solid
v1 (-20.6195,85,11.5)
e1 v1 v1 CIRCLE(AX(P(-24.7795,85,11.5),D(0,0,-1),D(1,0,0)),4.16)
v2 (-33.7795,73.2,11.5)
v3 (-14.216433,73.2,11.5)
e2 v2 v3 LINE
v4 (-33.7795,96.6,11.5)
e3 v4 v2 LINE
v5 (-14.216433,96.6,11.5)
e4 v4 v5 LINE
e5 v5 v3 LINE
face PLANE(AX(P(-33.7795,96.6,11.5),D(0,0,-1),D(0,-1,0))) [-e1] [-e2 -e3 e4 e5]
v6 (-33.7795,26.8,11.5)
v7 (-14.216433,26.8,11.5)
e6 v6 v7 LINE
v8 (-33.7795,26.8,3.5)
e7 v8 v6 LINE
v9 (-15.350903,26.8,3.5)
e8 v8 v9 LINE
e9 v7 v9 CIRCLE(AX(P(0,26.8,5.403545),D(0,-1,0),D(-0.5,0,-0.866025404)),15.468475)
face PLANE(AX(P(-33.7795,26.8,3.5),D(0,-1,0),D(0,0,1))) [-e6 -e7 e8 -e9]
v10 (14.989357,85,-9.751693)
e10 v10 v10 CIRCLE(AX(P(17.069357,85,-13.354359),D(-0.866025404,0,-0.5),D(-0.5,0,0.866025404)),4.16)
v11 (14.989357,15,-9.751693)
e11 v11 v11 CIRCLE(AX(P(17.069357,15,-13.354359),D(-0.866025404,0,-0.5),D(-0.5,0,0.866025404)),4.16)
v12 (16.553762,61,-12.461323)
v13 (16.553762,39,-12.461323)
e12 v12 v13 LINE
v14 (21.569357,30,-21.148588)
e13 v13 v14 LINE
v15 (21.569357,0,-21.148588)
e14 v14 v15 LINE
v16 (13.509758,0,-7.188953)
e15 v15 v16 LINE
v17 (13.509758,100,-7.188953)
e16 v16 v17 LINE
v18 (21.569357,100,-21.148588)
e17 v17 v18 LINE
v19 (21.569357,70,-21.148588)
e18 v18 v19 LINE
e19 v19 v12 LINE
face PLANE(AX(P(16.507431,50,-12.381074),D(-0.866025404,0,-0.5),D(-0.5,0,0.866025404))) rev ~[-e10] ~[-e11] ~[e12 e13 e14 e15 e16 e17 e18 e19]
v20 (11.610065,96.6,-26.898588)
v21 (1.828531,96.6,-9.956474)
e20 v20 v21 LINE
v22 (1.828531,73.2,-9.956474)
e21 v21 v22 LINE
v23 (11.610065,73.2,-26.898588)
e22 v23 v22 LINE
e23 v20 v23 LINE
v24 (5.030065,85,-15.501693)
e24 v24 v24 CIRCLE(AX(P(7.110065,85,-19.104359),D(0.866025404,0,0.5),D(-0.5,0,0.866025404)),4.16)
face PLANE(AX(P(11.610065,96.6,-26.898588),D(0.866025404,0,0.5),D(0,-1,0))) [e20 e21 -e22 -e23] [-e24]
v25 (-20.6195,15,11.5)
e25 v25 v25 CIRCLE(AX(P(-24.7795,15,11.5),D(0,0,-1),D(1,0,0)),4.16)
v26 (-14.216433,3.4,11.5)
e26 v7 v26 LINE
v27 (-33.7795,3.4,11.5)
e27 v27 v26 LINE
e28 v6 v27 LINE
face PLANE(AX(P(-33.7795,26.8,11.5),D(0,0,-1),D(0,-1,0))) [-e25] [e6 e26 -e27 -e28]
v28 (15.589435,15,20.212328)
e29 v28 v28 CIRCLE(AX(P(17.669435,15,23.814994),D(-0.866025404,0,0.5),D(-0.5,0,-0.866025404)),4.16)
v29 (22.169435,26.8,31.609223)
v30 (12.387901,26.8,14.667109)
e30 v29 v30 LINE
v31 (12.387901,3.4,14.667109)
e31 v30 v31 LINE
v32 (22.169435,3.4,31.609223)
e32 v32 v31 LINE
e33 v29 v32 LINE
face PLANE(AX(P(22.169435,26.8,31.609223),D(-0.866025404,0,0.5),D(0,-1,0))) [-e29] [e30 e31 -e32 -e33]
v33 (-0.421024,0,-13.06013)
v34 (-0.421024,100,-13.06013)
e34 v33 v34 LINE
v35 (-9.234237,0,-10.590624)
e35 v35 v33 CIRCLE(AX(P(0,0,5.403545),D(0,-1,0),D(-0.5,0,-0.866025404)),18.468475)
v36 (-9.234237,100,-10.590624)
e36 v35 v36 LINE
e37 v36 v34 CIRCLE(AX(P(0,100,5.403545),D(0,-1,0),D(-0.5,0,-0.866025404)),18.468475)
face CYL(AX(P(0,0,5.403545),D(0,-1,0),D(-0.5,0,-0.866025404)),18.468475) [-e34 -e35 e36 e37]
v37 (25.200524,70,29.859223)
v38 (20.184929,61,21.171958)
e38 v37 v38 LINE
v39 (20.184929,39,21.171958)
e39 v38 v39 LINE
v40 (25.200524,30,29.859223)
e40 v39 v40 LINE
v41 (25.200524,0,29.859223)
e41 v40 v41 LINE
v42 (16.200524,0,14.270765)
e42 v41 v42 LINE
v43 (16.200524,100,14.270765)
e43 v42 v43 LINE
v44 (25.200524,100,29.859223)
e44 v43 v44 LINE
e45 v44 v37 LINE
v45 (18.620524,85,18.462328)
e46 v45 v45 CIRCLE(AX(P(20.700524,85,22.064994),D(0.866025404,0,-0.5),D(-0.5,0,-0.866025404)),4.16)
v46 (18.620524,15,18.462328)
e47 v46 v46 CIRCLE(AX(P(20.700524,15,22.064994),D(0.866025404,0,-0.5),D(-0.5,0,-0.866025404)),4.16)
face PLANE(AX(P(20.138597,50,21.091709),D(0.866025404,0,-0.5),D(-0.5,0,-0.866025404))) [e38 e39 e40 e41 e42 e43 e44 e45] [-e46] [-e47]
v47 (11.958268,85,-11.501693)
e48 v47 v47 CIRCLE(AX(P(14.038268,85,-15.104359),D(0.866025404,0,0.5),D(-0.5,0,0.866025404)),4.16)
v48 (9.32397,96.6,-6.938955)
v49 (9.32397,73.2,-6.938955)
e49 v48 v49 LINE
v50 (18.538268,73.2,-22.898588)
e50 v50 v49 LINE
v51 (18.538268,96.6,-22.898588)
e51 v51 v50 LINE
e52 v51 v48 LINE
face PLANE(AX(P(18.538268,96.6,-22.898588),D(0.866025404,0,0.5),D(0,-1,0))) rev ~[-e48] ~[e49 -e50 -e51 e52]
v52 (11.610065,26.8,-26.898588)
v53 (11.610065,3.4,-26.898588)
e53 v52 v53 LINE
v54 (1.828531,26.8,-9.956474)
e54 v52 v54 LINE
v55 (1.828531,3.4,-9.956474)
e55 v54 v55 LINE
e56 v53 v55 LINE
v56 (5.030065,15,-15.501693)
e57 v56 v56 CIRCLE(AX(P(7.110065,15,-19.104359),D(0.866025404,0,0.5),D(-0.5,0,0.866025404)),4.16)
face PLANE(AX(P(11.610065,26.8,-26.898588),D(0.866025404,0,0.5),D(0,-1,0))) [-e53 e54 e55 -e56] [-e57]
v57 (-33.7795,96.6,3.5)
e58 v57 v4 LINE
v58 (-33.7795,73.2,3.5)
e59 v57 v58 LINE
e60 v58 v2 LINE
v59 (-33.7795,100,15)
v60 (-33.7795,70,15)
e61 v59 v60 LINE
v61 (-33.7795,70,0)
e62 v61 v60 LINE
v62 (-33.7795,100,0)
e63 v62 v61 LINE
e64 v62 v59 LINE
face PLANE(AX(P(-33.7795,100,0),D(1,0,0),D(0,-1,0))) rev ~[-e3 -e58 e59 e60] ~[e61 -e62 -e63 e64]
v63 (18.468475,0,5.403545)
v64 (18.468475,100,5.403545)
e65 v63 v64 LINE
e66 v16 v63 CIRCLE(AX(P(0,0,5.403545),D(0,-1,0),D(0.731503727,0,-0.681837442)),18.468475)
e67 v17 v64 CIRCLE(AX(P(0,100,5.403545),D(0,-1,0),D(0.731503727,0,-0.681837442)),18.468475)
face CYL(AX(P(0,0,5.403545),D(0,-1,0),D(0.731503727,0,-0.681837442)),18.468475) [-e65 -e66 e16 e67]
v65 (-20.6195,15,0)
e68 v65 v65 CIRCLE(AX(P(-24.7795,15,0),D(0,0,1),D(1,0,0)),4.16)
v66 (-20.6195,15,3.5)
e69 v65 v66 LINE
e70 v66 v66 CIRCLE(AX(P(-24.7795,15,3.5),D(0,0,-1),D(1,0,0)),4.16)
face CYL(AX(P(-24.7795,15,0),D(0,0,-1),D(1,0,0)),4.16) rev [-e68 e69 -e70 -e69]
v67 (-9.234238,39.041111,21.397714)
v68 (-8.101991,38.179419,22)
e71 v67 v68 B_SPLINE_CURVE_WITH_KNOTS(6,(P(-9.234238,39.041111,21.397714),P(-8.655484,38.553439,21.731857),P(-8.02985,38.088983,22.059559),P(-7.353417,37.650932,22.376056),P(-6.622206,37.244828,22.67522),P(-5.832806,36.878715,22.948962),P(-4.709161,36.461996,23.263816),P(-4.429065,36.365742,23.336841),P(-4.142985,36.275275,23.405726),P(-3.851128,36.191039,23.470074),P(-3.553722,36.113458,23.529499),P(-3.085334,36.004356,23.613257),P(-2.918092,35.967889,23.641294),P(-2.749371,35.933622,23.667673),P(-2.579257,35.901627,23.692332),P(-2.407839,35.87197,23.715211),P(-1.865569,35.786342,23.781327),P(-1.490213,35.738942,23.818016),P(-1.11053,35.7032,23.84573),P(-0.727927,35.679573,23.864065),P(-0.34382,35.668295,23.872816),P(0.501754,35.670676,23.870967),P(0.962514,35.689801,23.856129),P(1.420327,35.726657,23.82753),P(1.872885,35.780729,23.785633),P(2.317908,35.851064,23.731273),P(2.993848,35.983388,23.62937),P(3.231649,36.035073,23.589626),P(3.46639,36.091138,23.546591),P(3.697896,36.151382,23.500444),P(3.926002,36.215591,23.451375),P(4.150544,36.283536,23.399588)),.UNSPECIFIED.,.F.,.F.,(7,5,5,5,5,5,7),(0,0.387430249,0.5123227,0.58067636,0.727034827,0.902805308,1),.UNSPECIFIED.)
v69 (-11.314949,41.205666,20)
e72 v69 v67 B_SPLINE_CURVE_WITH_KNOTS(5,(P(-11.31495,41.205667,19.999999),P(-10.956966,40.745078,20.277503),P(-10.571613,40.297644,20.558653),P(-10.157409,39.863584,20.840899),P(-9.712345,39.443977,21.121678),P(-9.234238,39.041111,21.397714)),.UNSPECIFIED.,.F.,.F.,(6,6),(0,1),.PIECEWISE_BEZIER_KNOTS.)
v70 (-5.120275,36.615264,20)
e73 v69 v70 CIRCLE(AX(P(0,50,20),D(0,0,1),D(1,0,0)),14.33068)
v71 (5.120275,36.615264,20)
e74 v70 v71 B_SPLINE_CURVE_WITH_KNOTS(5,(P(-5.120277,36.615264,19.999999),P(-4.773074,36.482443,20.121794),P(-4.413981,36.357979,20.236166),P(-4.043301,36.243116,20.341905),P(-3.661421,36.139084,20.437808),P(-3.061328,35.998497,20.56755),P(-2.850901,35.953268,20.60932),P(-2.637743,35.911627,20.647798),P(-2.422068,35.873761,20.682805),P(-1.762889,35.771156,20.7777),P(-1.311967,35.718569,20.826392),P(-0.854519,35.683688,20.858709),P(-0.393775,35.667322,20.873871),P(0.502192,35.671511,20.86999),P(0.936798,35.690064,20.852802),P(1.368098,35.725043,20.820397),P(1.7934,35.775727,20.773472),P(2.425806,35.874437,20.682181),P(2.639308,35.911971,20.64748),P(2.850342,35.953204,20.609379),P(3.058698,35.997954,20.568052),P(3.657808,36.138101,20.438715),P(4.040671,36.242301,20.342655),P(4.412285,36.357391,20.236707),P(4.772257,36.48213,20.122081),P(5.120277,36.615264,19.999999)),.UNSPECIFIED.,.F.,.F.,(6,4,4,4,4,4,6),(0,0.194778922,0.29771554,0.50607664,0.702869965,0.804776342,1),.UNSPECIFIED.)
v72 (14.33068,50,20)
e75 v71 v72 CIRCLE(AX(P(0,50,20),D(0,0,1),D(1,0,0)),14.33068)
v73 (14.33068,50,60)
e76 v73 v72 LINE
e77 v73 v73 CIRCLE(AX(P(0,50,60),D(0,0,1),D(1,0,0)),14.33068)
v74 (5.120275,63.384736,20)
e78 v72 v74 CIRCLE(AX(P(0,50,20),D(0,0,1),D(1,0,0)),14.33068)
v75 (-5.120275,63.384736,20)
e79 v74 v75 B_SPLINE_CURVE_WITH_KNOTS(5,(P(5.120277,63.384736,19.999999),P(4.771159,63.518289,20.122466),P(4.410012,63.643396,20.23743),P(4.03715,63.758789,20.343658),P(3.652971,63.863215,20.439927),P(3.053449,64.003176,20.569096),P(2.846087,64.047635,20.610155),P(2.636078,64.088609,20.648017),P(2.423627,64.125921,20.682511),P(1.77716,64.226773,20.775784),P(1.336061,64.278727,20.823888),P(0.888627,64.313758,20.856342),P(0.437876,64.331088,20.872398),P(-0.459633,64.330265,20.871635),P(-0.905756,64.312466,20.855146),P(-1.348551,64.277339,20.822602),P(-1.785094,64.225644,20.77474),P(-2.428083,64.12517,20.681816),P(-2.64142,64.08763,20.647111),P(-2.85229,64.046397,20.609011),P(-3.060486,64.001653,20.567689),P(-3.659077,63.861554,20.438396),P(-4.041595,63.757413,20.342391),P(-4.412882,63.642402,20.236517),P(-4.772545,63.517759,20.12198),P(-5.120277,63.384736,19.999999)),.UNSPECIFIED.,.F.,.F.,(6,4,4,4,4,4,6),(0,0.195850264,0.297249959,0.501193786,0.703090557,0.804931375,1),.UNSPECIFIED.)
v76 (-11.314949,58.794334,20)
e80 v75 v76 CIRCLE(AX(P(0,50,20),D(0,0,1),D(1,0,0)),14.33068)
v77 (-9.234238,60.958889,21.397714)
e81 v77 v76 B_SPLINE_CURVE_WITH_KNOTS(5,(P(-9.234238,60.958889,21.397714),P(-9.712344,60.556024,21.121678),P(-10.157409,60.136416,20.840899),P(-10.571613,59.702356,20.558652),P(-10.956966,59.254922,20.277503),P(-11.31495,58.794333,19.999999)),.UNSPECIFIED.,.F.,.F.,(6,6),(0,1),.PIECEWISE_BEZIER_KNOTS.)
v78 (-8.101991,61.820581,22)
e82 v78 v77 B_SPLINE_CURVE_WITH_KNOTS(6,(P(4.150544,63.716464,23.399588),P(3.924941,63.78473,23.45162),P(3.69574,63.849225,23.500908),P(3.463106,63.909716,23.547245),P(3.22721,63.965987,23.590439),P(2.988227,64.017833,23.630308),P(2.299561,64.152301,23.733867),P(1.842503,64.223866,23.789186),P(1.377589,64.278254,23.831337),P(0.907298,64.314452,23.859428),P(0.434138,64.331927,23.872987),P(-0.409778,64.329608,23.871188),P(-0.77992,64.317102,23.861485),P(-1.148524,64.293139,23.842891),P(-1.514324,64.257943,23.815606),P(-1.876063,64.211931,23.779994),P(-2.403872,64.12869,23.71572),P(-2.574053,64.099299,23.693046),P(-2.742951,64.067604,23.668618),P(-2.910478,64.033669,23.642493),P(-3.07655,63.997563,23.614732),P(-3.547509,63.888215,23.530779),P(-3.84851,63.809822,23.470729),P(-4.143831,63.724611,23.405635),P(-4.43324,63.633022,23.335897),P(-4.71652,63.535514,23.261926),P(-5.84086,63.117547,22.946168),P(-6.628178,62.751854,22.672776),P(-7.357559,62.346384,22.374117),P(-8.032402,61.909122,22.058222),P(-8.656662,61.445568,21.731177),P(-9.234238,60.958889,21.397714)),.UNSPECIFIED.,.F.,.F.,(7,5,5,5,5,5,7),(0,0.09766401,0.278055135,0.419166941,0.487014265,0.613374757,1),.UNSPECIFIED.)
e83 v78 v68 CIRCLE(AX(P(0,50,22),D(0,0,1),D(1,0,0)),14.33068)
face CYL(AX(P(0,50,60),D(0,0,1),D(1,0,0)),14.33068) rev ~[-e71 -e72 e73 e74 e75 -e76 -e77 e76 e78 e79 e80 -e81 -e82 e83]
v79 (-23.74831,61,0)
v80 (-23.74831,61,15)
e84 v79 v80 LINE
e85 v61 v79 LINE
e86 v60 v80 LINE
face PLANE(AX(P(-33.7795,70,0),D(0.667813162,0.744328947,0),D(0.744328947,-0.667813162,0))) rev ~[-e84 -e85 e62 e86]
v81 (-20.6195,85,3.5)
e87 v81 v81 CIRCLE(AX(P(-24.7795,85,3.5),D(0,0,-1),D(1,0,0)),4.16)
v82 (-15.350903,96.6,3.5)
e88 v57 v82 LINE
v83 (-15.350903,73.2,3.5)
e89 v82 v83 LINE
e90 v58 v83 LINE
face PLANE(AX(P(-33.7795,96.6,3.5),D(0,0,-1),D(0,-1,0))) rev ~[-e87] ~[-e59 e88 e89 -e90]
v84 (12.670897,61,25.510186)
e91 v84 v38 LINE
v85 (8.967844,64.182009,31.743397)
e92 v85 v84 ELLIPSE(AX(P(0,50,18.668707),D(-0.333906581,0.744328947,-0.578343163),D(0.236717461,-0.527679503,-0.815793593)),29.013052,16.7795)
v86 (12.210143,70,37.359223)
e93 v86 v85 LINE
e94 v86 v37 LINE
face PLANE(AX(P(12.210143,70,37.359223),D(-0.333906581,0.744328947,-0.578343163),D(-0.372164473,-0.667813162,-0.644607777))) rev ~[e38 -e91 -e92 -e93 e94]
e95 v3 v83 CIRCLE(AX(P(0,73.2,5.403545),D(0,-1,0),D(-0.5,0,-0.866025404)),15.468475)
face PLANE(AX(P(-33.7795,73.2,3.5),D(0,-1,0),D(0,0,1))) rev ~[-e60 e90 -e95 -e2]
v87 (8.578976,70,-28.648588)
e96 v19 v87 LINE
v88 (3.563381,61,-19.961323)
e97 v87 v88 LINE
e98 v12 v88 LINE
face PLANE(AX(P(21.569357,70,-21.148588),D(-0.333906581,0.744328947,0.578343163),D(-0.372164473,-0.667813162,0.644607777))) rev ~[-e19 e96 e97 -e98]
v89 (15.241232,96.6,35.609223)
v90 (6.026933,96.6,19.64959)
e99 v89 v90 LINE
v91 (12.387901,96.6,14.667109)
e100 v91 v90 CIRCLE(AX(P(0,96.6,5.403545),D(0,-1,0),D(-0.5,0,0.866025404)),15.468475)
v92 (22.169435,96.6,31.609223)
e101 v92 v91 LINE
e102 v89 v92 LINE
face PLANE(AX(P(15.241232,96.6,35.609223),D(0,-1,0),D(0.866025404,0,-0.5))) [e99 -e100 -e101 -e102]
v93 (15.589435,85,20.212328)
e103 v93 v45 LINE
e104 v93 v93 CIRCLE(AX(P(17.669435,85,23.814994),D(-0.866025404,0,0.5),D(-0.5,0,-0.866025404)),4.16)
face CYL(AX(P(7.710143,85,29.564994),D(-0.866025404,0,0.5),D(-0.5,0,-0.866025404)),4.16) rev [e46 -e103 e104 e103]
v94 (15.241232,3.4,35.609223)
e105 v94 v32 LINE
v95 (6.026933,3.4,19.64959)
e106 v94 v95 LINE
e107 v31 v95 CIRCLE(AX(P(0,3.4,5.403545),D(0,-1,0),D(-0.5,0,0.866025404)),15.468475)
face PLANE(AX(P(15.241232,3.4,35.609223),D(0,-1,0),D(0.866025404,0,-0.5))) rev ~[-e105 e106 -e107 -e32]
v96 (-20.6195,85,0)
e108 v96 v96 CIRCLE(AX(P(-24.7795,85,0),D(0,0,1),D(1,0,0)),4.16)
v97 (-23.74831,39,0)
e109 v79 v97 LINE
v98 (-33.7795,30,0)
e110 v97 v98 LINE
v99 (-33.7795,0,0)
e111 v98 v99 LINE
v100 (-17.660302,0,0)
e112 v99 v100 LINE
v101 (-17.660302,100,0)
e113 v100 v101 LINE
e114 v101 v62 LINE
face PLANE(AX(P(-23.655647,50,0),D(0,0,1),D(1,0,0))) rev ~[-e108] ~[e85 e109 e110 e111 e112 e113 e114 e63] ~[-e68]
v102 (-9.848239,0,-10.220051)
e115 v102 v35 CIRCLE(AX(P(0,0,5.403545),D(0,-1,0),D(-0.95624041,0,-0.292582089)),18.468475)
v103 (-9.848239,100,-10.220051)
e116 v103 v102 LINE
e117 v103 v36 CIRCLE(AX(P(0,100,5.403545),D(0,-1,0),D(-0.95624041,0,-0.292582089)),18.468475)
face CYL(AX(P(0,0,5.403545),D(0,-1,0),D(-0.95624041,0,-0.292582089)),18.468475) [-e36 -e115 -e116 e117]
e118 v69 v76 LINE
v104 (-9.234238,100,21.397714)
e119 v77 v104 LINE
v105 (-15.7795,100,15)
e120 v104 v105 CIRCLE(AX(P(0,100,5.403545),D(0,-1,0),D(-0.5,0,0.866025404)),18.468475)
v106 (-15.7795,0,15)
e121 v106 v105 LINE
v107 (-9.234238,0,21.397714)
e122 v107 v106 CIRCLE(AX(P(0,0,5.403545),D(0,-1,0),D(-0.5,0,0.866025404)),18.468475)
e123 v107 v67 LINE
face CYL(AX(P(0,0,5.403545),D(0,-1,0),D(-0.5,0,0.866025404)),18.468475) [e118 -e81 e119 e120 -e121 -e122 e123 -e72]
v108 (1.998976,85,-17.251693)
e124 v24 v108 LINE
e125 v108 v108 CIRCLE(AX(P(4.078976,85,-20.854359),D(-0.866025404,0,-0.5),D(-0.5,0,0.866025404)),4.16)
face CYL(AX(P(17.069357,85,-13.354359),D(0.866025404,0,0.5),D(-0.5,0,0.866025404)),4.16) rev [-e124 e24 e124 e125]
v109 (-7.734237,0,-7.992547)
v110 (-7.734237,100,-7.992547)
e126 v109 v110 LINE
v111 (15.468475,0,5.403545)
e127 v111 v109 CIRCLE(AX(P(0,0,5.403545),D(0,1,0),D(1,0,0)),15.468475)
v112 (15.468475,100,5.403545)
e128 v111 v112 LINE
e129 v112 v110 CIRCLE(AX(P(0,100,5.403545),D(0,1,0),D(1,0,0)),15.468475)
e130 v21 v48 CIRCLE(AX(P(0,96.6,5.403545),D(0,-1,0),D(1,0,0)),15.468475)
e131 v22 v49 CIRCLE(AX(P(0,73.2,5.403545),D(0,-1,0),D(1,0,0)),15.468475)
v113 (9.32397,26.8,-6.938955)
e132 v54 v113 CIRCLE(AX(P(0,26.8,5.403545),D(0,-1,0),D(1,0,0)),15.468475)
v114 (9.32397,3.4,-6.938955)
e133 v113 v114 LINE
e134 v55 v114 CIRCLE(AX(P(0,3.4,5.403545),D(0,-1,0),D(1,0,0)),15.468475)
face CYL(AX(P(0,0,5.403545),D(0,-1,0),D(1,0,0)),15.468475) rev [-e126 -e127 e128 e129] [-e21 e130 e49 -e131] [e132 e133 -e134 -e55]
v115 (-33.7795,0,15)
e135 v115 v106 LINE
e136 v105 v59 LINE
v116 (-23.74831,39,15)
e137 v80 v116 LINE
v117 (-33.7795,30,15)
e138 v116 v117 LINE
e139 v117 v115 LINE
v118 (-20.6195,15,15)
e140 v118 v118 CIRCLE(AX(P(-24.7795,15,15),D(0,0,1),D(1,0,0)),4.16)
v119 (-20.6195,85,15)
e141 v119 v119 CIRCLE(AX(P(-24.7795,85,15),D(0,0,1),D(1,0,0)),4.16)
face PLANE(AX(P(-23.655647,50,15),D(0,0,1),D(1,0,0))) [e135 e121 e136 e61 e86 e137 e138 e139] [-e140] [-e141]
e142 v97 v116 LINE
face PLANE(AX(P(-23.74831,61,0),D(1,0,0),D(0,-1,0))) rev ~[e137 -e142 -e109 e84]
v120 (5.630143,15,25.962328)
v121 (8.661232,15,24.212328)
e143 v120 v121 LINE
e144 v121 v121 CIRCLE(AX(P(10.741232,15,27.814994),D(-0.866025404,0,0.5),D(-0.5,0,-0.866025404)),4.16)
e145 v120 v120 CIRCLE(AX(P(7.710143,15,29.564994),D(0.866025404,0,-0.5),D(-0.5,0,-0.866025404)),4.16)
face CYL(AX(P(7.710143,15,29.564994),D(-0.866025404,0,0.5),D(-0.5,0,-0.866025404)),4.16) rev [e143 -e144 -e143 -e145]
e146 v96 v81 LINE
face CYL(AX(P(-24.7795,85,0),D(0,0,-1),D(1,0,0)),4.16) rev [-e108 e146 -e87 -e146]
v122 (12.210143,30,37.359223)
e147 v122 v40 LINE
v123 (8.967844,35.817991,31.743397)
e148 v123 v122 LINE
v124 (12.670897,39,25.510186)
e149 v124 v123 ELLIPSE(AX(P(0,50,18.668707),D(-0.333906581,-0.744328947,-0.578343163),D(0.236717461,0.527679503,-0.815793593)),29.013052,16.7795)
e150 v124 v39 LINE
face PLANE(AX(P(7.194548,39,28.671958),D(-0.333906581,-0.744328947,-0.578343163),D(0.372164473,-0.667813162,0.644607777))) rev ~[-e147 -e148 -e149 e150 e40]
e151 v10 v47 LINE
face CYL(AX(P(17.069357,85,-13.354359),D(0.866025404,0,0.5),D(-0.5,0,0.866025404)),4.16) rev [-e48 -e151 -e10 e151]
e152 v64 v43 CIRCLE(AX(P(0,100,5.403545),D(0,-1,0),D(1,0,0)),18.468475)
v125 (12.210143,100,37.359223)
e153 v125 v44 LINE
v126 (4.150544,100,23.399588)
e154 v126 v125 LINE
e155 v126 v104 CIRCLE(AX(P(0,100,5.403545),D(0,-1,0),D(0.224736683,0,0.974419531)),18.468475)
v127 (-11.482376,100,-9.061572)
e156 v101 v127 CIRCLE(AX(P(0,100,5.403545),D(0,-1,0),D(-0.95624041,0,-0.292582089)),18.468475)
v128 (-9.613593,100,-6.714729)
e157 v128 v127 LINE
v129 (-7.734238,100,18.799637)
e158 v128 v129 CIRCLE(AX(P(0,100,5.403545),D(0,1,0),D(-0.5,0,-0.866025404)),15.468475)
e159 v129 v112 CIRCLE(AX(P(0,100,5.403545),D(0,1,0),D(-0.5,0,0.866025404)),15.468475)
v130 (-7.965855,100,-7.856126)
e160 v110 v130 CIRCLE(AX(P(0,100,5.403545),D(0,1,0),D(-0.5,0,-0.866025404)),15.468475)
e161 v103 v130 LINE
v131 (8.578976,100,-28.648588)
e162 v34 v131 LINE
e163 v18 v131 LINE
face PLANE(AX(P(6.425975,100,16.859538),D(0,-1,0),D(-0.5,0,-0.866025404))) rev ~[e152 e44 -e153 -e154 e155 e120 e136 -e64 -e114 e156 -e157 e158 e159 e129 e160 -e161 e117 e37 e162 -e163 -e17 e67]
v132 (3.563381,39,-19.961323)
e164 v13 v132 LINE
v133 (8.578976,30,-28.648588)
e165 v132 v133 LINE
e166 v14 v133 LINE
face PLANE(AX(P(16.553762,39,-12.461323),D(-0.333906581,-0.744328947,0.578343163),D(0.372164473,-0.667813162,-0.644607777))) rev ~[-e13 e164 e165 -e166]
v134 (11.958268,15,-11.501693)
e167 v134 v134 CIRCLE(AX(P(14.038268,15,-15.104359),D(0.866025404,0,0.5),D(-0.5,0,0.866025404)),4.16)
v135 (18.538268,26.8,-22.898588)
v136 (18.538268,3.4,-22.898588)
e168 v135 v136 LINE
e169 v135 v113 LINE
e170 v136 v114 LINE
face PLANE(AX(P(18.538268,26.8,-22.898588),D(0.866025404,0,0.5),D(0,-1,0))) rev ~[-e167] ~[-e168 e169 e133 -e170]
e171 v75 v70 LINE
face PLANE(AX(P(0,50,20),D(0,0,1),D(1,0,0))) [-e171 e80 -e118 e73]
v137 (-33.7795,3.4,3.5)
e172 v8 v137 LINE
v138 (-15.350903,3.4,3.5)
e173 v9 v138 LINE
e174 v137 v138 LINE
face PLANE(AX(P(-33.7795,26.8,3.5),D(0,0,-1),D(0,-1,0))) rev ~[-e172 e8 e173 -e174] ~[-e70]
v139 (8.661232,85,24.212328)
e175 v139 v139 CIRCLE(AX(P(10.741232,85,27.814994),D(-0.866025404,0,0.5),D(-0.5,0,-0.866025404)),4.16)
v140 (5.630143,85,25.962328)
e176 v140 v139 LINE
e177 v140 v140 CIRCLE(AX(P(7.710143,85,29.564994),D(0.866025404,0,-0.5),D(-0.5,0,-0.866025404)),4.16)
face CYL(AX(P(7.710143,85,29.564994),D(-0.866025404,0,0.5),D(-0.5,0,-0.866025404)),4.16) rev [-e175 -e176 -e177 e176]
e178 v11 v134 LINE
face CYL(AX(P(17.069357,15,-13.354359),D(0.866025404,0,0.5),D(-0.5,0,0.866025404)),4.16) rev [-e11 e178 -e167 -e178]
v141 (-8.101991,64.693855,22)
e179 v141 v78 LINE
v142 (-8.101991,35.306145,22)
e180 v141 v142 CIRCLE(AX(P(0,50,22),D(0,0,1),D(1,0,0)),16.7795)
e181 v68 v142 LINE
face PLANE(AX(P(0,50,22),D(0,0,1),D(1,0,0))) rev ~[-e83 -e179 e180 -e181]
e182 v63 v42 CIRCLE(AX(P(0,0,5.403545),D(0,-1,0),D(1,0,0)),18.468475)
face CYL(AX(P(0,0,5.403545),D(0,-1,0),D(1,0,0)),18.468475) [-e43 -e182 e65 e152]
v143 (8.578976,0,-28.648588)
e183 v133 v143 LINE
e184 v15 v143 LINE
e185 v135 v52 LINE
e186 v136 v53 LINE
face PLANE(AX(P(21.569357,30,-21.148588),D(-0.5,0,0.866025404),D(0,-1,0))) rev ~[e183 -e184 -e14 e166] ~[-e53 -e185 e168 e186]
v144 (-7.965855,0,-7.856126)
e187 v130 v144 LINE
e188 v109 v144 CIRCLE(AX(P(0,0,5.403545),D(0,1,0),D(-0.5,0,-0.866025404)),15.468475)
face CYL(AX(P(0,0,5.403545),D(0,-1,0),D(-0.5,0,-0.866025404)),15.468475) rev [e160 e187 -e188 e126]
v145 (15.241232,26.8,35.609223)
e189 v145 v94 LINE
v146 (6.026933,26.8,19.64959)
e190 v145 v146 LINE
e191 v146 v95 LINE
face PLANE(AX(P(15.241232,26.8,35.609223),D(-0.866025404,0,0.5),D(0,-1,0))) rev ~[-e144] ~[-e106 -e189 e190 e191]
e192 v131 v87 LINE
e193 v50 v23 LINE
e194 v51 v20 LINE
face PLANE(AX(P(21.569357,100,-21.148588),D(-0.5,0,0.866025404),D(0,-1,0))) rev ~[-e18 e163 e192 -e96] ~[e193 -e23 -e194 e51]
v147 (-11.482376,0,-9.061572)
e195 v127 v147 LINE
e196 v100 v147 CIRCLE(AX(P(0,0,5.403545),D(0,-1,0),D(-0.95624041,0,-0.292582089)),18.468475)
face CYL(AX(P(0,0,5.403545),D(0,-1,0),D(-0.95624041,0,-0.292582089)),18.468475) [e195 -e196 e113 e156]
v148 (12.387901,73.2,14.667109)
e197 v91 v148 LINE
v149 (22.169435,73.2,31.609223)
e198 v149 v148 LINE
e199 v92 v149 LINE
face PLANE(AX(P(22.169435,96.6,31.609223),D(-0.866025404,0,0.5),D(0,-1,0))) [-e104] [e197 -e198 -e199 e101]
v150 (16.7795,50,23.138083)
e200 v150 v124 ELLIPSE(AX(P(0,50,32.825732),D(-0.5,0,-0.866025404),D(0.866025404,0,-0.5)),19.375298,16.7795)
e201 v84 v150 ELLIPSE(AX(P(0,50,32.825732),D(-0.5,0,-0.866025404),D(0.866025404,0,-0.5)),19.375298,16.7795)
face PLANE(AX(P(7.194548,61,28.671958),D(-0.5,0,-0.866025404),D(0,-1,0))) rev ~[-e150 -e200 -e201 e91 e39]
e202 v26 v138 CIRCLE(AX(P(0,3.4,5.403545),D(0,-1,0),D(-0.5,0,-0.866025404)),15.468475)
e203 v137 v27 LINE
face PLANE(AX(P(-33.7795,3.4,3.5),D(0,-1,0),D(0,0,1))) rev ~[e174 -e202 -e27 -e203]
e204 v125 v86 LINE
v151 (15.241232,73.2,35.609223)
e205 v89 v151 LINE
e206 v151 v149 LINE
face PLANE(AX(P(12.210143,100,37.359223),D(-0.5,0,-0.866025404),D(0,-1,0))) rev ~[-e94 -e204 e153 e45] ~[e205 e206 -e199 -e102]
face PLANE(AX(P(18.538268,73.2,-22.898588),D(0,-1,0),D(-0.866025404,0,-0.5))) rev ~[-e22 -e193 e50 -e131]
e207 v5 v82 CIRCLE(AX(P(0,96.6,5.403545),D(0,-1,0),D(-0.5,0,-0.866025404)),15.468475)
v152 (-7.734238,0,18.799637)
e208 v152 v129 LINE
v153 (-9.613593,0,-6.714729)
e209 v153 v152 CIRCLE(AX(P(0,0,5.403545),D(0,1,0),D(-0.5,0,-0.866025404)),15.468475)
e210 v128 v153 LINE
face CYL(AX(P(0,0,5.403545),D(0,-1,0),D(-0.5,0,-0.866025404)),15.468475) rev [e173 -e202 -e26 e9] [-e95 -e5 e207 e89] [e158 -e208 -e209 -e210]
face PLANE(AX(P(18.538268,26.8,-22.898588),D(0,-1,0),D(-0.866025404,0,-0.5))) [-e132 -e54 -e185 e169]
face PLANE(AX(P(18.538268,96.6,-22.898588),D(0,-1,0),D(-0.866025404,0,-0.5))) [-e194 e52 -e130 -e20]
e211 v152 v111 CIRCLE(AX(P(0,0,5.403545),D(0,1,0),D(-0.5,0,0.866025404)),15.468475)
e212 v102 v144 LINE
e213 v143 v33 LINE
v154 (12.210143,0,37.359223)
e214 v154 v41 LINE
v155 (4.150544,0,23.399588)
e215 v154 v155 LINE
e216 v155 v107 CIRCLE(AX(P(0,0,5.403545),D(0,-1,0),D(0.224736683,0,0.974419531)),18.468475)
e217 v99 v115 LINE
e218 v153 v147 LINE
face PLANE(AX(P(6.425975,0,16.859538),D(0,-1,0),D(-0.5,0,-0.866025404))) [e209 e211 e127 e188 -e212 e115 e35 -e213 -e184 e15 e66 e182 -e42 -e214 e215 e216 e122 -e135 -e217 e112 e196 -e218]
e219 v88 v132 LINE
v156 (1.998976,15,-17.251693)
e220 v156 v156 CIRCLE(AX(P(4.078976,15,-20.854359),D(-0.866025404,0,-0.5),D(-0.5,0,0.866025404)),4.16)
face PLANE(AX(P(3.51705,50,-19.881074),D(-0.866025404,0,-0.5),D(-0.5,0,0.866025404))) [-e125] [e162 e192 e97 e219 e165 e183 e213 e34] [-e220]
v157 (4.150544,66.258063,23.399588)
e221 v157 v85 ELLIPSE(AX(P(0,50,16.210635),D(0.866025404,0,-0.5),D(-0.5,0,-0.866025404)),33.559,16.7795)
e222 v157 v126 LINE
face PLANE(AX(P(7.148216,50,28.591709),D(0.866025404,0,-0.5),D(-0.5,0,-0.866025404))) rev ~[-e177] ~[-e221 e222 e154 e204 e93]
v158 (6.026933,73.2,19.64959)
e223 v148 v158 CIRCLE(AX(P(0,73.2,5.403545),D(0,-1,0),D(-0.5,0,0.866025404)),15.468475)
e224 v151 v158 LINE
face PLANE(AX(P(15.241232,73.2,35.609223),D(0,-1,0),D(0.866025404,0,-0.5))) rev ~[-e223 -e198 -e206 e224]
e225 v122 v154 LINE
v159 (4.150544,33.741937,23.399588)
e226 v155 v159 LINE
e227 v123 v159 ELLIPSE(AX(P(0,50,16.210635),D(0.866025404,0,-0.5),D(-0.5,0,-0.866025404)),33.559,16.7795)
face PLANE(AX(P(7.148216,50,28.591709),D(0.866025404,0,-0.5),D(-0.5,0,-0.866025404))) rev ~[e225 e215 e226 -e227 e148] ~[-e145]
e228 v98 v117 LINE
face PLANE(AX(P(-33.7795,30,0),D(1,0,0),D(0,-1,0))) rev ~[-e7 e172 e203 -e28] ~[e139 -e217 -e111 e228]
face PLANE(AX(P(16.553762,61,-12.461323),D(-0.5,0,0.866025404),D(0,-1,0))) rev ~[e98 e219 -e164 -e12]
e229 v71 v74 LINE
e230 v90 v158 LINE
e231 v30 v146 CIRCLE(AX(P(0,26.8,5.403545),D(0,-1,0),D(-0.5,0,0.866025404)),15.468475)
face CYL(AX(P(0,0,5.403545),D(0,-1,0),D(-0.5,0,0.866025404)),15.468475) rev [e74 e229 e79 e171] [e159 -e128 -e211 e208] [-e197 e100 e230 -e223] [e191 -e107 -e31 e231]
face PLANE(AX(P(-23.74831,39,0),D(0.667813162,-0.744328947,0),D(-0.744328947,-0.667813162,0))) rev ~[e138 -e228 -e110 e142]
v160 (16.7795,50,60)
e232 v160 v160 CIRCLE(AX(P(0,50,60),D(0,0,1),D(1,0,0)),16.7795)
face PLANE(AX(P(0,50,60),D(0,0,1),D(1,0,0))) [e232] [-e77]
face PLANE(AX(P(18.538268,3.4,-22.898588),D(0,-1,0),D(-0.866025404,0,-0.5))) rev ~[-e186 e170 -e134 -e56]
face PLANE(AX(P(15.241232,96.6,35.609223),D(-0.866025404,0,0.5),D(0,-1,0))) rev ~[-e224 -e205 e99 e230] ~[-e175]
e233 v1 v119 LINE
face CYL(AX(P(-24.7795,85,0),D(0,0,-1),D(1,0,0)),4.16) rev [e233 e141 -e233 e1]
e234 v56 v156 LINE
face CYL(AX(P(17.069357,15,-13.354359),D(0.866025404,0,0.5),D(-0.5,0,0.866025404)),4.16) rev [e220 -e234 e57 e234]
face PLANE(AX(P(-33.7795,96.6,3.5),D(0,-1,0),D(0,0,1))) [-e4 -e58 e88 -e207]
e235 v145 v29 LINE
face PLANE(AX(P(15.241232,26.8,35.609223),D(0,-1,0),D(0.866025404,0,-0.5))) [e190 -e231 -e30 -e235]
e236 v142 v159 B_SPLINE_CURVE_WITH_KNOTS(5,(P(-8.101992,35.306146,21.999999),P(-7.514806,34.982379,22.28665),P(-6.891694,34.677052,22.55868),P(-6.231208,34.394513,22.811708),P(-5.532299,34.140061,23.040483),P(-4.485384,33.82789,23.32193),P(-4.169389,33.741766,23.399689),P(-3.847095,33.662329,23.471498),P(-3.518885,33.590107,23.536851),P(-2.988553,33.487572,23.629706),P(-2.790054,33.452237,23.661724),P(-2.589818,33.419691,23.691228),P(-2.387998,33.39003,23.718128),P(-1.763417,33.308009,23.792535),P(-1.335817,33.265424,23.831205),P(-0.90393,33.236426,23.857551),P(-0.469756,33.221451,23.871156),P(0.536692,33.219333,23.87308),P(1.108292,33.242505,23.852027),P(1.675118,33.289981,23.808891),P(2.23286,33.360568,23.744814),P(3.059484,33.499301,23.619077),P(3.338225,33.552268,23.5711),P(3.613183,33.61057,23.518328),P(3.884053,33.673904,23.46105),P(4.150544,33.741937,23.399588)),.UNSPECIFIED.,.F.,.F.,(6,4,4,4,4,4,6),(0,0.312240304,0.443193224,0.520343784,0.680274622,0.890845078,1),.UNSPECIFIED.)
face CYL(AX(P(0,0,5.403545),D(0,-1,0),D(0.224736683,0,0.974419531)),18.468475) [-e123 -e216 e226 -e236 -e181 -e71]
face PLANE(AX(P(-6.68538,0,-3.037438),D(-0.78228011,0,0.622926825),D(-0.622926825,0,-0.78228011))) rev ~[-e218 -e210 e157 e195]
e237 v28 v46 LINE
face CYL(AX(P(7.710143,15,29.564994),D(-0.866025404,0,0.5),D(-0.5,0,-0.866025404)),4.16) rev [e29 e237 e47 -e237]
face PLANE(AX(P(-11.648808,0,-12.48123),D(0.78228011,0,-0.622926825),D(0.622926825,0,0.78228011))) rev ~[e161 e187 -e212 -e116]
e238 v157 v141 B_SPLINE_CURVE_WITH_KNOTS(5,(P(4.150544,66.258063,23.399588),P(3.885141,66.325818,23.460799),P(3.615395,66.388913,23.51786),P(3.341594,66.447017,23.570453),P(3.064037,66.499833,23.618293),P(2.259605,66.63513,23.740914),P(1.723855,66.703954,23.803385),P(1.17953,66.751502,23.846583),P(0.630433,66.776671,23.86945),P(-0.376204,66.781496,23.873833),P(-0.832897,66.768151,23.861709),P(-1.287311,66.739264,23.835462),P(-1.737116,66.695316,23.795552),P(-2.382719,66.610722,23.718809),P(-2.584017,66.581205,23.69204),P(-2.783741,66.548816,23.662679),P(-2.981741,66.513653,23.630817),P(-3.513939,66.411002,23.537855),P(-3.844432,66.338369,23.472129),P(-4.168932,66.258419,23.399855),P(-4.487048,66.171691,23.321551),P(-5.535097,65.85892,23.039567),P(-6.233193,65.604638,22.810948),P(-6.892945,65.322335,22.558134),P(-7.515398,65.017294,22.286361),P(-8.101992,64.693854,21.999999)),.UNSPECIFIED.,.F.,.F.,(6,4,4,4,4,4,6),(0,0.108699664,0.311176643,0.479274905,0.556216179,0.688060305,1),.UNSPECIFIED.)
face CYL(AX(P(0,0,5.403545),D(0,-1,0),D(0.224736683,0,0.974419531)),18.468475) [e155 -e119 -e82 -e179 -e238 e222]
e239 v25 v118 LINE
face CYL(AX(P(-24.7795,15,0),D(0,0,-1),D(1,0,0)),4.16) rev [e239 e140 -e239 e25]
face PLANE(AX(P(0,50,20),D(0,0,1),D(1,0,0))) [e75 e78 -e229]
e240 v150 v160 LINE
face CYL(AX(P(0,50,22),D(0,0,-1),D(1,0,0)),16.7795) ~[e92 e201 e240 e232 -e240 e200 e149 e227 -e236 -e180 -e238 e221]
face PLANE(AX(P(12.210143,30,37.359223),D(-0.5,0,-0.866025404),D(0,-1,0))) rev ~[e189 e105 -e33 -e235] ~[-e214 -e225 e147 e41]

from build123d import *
from build123d import SkipClean  # not in build123d's __all__

# Parameters (mm, degrees)
F0_R      = 4.16
F1_DEPTH  = 15
F3_DEPTH  = 100
F4_W      = 23.4
F4_H      = 8
F5_DEPTH  = 25
F7_COUNT  = 3
F9_START  = 22
F8_R      = 16.7795
F8_R_2    = 13.7795
F9_DEPTH  = 38
F10_R     = 13.7795
F11_DEPTH = 40
F12_R     = 14.33068
F12_R_2   = 13.7795
F13_DEPTH = 40
F15_DEPTH = 100


# Not quite as in the source:
# - a feature names something its author has since deleted; it is built from what else it names


with BuildPart() as f1:
    # F0 (on Top) → F1 (new body)
    with BuildSketch(Plane.XY):
        Polygon((-33.7795, 0), (-15.7795, 0), (-15.7795, 50), (-15.7795, 100), (-33.7795, 100), (-33.7795, 70), (-23.7483102828, 61), (-23.7483102828, 50), (-23.7483102828, 39), (-33.7795, 30), align=None)
        with Locations((-24.7795, 15)):
            Circle(F0_R, mode=Mode.SUBTRACT)
        with Locations((-24.7795, 85)):
            Circle(F0_R, mode=Mode.SUBTRACT)
    extrude(amount=F1_DEPTH)

    # F2 (on face) → F3 (join)
    with BuildSketch(Plane.XZ):
        with BuildLine():
            ThreePointArc((-7.7342375, -7.9925473083), (-15.468475, 5.4035449996), (-7.7342375, 18.7996373074))
            Line((-7.7342375, 18.7996373074), (-9.2342375, 21.3977135187))
            ThreePointArc((-9.2342375, 21.3977135187), (-12.9094713485, 18.6107444881), (-15.7795, 15))
            Line((-15.7795, 15), (-15.7795, 0))
            Line((-15.7795, 0), (-17.6603021, 0))
            ThreePointArc((-17.6603021, 0), (-14.4523144066, -6.0949408624), (-9.2342375, -10.5906235196))
            Line((-9.2342375, -10.5906235196), (-7.7342375, -7.9925473083))
        make_face()
    extrude(amount=-F3_DEPTH)

    # F4 (on face) → F5 (cut)
    with BuildSketch(Plane(origin=(-33.7795, 0, 0), x_dir=(0, -1, 0), z_dir=(-1, 0, 0))):
        with Locations((-84.9, 7.5)):
            Rectangle(F4_W, F4_H)
        with Locations((-15.1, 7.5)):
            Rectangle(F4_W, F4_H)
    extrude(amount=-F5_DEPTH, mode=Mode.SUBTRACT)

    # F7: F1 ×3 about axis
    f7_axis = Axis((0, 0, 5.4035449996), (0, -1, 0))


with BuildPart() as f1_1:
    add(f1.part, clean=False)
    with SkipClean():  # cleaning this boolean's faces spoils the solid; the shape is the same uncleaned
        for i in range(1, F7_COUNT):
            add(f1.part.rotate(f7_axis, i * 360 / F7_COUNT), clean=False)

    # F8 (on Top) → F9 (join)
    with BuildSketch(Plane.XY.offset(F9_START)):
        with Locations((0, 50)):
            Circle(F8_R)
        with Locations((0, 50)):
            Circle(F8_R_2, mode=Mode.SUBTRACT)
    with SkipClean():  # cleaning this boolean's faces spoils the solid; the shape is the same uncleaned
        extrude(amount=F9_DEPTH)

    # F10 (on face) → F11 (cut)
    with BuildSketch(Plane.XY.offset(60)):
        with Locations((0, 50)):
            Circle(F10_R)
    with SkipClean():  # cleaning this boolean's faces spoils the solid; the shape is the same uncleaned
        extrude(amount=-F11_DEPTH, mode=Mode.SUBTRACT)

    # F12 (on face) → F13 (cut)
    with BuildSketch(Plane.XY.offset(60)):
        with Locations((0, 50)):
            Circle(F12_R)
        with Locations((0, 50)):
            Circle(F12_R_2, mode=Mode.SUBTRACT)
    with SkipClean():  # cleaning this boolean's faces spoils the solid; the shape is the same uncleaned
        extrude(amount=-F13_DEPTH, mode=Mode.SUBTRACT)

    # F14 (on Front) → F15 (cut)
    with BuildSketch(Plane.XZ):
        Polygon((-4.9232800736, -4.035219008), (-6.6853797605, -3.0374381485), (-13.2133684748, -11.2353765363), (-11.6488082544, -12.4812301861), align=None)
    extrude(amount=-F15_DEPTH, mode=Mode.SUBTRACT)


solid = f1_1.part
